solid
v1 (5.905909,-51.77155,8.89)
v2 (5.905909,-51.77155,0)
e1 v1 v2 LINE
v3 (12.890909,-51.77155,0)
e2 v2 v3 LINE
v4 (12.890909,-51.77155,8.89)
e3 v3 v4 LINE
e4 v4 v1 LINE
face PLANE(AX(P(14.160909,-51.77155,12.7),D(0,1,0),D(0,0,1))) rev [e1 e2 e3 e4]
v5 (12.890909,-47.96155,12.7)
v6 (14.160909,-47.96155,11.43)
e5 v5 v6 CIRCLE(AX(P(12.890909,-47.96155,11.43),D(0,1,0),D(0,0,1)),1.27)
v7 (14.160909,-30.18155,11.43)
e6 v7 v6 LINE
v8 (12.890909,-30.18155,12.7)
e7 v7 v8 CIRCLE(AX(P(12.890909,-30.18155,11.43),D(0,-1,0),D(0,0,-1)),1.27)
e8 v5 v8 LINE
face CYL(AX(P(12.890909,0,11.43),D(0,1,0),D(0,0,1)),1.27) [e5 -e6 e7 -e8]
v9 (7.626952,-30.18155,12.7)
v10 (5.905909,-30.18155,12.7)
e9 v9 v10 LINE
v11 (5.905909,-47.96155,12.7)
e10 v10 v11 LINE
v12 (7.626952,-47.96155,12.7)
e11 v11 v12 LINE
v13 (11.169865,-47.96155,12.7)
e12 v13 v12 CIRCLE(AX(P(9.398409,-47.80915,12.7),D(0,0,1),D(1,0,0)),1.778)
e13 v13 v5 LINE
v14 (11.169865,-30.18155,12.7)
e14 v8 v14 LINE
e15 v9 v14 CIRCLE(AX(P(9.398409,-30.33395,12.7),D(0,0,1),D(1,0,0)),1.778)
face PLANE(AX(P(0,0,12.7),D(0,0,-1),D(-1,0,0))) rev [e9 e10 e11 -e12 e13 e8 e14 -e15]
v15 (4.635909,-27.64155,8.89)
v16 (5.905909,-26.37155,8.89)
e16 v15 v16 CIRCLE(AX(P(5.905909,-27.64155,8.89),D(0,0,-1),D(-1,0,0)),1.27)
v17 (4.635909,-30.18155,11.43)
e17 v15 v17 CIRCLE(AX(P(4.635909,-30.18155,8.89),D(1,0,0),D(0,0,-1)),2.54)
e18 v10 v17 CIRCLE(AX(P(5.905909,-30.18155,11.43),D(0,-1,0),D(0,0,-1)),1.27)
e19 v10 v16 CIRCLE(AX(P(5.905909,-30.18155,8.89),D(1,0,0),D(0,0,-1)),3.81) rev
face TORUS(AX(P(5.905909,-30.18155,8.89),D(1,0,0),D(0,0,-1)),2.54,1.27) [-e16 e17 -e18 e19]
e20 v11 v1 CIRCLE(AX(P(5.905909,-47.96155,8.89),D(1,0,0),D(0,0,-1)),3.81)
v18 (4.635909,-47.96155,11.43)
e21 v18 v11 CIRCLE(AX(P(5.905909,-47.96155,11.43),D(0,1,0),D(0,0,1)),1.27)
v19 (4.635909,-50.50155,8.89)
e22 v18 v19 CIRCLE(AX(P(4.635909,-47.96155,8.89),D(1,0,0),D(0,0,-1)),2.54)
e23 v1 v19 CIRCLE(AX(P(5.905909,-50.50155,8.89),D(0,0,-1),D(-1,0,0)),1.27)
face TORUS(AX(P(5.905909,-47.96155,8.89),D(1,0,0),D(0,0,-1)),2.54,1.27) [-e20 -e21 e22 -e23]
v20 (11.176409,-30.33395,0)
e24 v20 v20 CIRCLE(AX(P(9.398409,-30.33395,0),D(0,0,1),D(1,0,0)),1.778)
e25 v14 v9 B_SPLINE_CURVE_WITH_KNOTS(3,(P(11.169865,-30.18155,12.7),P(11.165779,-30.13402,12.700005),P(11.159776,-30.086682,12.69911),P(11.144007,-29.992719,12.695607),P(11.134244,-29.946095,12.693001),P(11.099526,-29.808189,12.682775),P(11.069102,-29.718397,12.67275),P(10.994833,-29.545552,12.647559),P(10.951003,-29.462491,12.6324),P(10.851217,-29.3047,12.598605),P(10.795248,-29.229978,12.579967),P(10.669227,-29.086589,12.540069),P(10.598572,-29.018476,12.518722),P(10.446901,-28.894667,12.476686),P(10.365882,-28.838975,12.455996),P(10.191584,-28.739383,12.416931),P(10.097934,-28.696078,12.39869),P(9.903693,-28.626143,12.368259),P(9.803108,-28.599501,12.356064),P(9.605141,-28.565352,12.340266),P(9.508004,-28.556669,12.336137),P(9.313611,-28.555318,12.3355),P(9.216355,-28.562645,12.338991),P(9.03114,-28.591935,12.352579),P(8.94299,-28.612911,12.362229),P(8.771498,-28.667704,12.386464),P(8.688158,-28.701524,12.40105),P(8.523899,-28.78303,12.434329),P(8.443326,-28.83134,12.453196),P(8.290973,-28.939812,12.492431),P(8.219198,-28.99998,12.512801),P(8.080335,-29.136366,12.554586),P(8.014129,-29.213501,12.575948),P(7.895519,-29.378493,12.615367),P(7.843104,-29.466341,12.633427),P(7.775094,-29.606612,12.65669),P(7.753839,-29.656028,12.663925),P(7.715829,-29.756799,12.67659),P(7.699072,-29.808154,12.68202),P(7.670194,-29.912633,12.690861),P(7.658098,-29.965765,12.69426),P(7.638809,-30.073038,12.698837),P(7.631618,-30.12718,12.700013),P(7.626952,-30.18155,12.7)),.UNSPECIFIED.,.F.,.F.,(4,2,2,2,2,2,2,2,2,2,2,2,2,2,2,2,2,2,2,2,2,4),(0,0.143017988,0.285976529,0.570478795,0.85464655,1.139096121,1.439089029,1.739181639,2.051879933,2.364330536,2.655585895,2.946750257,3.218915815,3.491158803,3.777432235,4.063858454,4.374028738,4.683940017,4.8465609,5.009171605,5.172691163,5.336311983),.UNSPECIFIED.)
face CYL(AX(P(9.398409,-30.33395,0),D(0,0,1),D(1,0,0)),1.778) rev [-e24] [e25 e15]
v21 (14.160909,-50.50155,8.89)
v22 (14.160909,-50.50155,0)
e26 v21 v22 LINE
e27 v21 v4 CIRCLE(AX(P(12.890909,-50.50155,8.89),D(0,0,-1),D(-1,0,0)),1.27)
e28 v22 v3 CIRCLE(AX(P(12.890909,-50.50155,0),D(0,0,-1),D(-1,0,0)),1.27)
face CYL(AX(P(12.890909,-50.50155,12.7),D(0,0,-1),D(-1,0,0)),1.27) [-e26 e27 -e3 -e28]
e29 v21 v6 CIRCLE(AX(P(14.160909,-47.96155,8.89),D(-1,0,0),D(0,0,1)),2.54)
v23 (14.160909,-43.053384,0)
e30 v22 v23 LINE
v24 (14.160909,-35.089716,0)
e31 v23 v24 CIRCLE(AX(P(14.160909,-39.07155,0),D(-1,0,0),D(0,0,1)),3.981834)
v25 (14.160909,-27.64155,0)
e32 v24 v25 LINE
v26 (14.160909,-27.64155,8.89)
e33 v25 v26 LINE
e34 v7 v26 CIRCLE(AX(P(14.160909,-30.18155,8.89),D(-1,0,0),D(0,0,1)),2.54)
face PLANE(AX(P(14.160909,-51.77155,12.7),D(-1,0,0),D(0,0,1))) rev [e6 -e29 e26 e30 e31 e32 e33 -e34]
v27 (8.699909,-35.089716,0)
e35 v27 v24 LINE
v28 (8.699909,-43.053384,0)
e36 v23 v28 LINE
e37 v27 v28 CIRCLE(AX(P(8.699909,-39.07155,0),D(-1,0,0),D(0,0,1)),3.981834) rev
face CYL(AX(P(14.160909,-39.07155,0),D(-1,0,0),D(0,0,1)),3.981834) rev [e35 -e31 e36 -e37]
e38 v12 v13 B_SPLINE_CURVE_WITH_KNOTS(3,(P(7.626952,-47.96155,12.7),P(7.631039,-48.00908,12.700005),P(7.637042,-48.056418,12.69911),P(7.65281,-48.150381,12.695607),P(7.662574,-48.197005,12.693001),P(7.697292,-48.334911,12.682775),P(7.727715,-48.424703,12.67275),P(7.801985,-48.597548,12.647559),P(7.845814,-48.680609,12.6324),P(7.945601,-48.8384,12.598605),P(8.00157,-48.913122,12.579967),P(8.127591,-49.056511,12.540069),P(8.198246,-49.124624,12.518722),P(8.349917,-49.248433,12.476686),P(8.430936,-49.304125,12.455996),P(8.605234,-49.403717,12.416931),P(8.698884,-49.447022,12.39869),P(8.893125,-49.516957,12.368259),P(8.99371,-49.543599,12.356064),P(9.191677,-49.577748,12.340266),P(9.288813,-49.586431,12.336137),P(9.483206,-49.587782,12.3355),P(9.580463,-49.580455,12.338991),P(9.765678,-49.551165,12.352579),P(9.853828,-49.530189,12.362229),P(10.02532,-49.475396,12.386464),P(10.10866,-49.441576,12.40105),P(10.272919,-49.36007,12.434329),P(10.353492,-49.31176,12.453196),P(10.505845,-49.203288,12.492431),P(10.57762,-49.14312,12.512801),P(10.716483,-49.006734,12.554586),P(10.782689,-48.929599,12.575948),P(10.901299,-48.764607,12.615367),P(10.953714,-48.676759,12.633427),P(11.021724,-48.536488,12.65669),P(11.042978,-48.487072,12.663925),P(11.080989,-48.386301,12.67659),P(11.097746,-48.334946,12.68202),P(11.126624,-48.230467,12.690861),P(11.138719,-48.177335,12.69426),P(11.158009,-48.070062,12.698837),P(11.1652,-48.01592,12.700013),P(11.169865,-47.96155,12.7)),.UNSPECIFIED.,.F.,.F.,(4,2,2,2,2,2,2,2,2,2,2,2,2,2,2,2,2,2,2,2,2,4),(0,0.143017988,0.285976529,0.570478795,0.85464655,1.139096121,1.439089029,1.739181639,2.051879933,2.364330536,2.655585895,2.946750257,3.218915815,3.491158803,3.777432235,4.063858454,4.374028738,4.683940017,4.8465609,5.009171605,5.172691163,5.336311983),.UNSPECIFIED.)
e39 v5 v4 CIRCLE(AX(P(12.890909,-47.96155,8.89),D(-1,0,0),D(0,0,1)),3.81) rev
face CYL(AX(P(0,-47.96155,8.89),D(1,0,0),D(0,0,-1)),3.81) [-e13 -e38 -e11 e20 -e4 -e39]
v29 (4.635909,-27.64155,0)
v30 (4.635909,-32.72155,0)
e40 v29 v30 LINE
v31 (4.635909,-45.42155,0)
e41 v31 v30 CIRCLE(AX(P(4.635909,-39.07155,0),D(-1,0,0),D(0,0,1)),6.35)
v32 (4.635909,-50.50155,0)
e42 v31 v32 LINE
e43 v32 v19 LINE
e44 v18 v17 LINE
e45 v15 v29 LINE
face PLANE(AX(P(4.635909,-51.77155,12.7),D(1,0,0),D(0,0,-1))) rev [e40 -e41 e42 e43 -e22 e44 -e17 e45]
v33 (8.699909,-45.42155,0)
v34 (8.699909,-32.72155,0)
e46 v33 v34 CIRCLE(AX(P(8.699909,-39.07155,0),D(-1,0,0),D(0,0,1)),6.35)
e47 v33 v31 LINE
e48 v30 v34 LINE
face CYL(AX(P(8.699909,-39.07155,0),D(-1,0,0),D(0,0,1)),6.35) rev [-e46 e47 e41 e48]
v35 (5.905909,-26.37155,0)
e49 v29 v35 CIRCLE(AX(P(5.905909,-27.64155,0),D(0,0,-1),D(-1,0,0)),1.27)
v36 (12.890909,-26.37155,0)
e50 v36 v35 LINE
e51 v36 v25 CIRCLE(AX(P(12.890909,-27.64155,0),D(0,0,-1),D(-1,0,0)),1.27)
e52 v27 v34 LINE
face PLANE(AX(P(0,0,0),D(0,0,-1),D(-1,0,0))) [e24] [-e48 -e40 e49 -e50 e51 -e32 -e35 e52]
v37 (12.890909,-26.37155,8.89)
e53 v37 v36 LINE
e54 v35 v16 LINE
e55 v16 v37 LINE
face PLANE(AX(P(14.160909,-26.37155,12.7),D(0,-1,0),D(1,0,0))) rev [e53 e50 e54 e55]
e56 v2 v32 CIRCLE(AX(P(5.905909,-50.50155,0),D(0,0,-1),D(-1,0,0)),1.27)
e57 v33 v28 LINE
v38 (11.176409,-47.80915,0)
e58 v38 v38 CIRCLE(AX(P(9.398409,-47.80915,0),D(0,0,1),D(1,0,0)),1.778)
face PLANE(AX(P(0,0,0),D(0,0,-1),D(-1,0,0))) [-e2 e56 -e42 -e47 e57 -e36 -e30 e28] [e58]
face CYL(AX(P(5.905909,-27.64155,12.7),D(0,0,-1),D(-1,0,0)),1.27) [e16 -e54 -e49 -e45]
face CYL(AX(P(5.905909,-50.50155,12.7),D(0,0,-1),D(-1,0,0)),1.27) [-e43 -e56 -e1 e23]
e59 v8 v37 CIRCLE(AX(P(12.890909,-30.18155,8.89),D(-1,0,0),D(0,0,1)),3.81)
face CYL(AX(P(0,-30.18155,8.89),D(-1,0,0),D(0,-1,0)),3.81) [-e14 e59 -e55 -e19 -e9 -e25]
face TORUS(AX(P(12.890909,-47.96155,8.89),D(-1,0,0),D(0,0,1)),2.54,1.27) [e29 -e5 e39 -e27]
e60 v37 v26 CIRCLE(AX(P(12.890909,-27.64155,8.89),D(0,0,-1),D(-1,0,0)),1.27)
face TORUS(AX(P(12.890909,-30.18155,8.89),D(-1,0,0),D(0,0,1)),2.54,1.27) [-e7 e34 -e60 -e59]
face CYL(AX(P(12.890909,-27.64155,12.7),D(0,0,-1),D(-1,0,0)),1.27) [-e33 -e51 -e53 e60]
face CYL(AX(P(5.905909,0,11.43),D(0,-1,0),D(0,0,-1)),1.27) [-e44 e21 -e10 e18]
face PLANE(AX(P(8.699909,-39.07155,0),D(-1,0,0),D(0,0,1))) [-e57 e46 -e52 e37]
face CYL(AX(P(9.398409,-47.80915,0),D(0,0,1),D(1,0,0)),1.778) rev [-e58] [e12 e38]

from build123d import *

# Parameters (mm, degrees)
SKETCH2_W           = 9.525
SKETCH2_H           = 25.4
BOSS_EXTRUDE1_DEPTH = 12.7
FILLET1_R           = 1.27
FILLET2_R           = 3.81
SKETCH15_R          = 3.981833791
CUT_EXTRUDE12_DEPTH = 55.150798834
SKETCH14_R          = 6.35
CUT_EXTRUDE13_DEPTH = 4.064
SKETCH17_R          = 1.778
CUT_EXTRUDE14_DEPTH = 56.155369014


with BuildPart() as part:
    # Sketch2 → Boss-Extrude1 (new body)
    with BuildSketch(Plane.XY):
        with Locations((9.39840893, -39.07155)):
            Rectangle(SKETCH2_W, SKETCH2_H)
    extrude(amount=BOSS_EXTRUDE1_DEPTH)

    # Fillet1
    fillet1_edges = [part.edges().sort_by_distance(p)[0] for p in [
        (4.63590893, -39.07155, 12.7),
        (14.16090893, -39.07155, 12.7),
        (4.63590893, -51.77155, 6.35),
        (4.63590893, -26.37155, 6.35),
        (14.16090893, -26.37155, 6.35),
        (14.16090893, -51.77155, 6.35),
    ]]
    fillet(fillet1_edges, radius=FILLET1_R)

    # Fillet2
    # the kernel refuses this fillet: 3.81 mm, written as the material it takes off along each edge
    with BuildSketch(Plane(origin=(14.16090893, -47.96155, 8.89), x_dir=(0, 0, 1), z_dir=(0, 1, 0))) as fillet2_piece_1:
        with BuildLine():
            CenterArc((2.54, -1.27), 1.27, 0, 90)
            Line((3.81, -1.27), (3.81, 0))
            Line((3.81, 0), (2.54, 0))
        make_face()
    revolve(axis=Axis((14.16090893, -47.96155, 8.89), (1, 0, 0)), revolution_arc=90, mode=Mode.SUBTRACT)
    with BuildSketch(Plane(origin=(14.16090893, -30.18155, 8.89), x_dir=(0, 1, 0), z_dir=(0, 0, -1))) as fillet2_piece_2:
        with BuildLine():
            CenterArc((2.54, -1.27), 1.27, 0, 90)
            Line((3.81, -1.27), (3.81, 0))
            Line((3.81, 0), (2.54, 0))
        make_face()
    revolve(axis=Axis((14.16090893, -30.18155, 8.89), (1, 0, 0)), revolution_arc=90, mode=Mode.SUBTRACT)
    with BuildSketch(Plane(origin=(4.63590893, -47.96155, 8.89), x_dir=(0, -1, 0), z_dir=(0, 0, -1))) as fillet2_piece_3:
        with BuildLine():
            CenterArc((2.54, -1.27), 1.27, 0, 90)
            Line((3.81, -1.27), (3.81, 0))
            Line((3.81, 0), (2.54, 0))
        make_face()
    revolve(axis=Axis((4.63590893, -47.96155, 8.89), (-1, 0, 0)), revolution_arc=90, mode=Mode.SUBTRACT)
    with BuildSketch(Plane(origin=(4.63590893, -30.18155, 8.89), x_dir=(0, 0, 1), z_dir=(0, -1, 0))) as fillet2_piece_4:
        with BuildLine():
            CenterArc((2.54, -1.27), 1.27, 0, 90)
            Line((3.81, -1.27), (3.81, 0))
            Line((3.81, 0), (2.54, 0))
        make_face()
    revolve(axis=Axis((4.63590893, -30.18155, 8.89), (-1, 0, 0)), revolution_arc=90, mode=Mode.SUBTRACT)
    with BuildSketch(Plane(origin=(14.16090893, -26.37155, 12.7), x_dir=(0, 0, -1), z_dir=(-1, 0, 0)), Plane(origin=(4.63590893, -51.77155, 12.7), x_dir=(0, 0, -1), z_dir=(1, 0, 0))) as fillet2_piece_5:
        with BuildLine():
            CenterArc((FILLET2_R, FILLET2_R), FILLET2_R, 180, 90)
            Line((0, FILLET2_R), (0, 0))
            Line((0, 0), (FILLET2_R, 0))
        make_face()
    extrude(amount=9.525, mode=Mode.SUBTRACT)

    # Sketch15 → Cut-Extrude12 (cut, through all)
    with BuildSketch(Plane.ZY.offset(-4.63590893)):
        with Locations((0, -39.07155)):
            Circle(SKETCH15_R)
    extrude(amount=-CUT_EXTRUDE12_DEPTH, mode=Mode.SUBTRACT)

    # Sketch14 → Cut-Extrude13 (cut)
    with BuildSketch(Plane.ZY.offset(-4.63590893)):
        with Locations((0, -39.07155)):
            Circle(SKETCH14_R)
    extrude(amount=-CUT_EXTRUDE13_DEPTH, mode=Mode.SUBTRACT)

    # Sketch17 → Cut-Extrude14 (cut, through all)
    with BuildSketch(Plane.XY.offset(12.7)):
        with Locations((9.39840893, -47.80915)):
            Circle(SKETCH17_R)
        with Locations((9.39840893, -30.33395)):
            Circle(SKETCH17_R)
    extrude(amount=-CUT_EXTRUDE14_DEPTH, mode=Mode.SUBTRACT)


solid = part.part
